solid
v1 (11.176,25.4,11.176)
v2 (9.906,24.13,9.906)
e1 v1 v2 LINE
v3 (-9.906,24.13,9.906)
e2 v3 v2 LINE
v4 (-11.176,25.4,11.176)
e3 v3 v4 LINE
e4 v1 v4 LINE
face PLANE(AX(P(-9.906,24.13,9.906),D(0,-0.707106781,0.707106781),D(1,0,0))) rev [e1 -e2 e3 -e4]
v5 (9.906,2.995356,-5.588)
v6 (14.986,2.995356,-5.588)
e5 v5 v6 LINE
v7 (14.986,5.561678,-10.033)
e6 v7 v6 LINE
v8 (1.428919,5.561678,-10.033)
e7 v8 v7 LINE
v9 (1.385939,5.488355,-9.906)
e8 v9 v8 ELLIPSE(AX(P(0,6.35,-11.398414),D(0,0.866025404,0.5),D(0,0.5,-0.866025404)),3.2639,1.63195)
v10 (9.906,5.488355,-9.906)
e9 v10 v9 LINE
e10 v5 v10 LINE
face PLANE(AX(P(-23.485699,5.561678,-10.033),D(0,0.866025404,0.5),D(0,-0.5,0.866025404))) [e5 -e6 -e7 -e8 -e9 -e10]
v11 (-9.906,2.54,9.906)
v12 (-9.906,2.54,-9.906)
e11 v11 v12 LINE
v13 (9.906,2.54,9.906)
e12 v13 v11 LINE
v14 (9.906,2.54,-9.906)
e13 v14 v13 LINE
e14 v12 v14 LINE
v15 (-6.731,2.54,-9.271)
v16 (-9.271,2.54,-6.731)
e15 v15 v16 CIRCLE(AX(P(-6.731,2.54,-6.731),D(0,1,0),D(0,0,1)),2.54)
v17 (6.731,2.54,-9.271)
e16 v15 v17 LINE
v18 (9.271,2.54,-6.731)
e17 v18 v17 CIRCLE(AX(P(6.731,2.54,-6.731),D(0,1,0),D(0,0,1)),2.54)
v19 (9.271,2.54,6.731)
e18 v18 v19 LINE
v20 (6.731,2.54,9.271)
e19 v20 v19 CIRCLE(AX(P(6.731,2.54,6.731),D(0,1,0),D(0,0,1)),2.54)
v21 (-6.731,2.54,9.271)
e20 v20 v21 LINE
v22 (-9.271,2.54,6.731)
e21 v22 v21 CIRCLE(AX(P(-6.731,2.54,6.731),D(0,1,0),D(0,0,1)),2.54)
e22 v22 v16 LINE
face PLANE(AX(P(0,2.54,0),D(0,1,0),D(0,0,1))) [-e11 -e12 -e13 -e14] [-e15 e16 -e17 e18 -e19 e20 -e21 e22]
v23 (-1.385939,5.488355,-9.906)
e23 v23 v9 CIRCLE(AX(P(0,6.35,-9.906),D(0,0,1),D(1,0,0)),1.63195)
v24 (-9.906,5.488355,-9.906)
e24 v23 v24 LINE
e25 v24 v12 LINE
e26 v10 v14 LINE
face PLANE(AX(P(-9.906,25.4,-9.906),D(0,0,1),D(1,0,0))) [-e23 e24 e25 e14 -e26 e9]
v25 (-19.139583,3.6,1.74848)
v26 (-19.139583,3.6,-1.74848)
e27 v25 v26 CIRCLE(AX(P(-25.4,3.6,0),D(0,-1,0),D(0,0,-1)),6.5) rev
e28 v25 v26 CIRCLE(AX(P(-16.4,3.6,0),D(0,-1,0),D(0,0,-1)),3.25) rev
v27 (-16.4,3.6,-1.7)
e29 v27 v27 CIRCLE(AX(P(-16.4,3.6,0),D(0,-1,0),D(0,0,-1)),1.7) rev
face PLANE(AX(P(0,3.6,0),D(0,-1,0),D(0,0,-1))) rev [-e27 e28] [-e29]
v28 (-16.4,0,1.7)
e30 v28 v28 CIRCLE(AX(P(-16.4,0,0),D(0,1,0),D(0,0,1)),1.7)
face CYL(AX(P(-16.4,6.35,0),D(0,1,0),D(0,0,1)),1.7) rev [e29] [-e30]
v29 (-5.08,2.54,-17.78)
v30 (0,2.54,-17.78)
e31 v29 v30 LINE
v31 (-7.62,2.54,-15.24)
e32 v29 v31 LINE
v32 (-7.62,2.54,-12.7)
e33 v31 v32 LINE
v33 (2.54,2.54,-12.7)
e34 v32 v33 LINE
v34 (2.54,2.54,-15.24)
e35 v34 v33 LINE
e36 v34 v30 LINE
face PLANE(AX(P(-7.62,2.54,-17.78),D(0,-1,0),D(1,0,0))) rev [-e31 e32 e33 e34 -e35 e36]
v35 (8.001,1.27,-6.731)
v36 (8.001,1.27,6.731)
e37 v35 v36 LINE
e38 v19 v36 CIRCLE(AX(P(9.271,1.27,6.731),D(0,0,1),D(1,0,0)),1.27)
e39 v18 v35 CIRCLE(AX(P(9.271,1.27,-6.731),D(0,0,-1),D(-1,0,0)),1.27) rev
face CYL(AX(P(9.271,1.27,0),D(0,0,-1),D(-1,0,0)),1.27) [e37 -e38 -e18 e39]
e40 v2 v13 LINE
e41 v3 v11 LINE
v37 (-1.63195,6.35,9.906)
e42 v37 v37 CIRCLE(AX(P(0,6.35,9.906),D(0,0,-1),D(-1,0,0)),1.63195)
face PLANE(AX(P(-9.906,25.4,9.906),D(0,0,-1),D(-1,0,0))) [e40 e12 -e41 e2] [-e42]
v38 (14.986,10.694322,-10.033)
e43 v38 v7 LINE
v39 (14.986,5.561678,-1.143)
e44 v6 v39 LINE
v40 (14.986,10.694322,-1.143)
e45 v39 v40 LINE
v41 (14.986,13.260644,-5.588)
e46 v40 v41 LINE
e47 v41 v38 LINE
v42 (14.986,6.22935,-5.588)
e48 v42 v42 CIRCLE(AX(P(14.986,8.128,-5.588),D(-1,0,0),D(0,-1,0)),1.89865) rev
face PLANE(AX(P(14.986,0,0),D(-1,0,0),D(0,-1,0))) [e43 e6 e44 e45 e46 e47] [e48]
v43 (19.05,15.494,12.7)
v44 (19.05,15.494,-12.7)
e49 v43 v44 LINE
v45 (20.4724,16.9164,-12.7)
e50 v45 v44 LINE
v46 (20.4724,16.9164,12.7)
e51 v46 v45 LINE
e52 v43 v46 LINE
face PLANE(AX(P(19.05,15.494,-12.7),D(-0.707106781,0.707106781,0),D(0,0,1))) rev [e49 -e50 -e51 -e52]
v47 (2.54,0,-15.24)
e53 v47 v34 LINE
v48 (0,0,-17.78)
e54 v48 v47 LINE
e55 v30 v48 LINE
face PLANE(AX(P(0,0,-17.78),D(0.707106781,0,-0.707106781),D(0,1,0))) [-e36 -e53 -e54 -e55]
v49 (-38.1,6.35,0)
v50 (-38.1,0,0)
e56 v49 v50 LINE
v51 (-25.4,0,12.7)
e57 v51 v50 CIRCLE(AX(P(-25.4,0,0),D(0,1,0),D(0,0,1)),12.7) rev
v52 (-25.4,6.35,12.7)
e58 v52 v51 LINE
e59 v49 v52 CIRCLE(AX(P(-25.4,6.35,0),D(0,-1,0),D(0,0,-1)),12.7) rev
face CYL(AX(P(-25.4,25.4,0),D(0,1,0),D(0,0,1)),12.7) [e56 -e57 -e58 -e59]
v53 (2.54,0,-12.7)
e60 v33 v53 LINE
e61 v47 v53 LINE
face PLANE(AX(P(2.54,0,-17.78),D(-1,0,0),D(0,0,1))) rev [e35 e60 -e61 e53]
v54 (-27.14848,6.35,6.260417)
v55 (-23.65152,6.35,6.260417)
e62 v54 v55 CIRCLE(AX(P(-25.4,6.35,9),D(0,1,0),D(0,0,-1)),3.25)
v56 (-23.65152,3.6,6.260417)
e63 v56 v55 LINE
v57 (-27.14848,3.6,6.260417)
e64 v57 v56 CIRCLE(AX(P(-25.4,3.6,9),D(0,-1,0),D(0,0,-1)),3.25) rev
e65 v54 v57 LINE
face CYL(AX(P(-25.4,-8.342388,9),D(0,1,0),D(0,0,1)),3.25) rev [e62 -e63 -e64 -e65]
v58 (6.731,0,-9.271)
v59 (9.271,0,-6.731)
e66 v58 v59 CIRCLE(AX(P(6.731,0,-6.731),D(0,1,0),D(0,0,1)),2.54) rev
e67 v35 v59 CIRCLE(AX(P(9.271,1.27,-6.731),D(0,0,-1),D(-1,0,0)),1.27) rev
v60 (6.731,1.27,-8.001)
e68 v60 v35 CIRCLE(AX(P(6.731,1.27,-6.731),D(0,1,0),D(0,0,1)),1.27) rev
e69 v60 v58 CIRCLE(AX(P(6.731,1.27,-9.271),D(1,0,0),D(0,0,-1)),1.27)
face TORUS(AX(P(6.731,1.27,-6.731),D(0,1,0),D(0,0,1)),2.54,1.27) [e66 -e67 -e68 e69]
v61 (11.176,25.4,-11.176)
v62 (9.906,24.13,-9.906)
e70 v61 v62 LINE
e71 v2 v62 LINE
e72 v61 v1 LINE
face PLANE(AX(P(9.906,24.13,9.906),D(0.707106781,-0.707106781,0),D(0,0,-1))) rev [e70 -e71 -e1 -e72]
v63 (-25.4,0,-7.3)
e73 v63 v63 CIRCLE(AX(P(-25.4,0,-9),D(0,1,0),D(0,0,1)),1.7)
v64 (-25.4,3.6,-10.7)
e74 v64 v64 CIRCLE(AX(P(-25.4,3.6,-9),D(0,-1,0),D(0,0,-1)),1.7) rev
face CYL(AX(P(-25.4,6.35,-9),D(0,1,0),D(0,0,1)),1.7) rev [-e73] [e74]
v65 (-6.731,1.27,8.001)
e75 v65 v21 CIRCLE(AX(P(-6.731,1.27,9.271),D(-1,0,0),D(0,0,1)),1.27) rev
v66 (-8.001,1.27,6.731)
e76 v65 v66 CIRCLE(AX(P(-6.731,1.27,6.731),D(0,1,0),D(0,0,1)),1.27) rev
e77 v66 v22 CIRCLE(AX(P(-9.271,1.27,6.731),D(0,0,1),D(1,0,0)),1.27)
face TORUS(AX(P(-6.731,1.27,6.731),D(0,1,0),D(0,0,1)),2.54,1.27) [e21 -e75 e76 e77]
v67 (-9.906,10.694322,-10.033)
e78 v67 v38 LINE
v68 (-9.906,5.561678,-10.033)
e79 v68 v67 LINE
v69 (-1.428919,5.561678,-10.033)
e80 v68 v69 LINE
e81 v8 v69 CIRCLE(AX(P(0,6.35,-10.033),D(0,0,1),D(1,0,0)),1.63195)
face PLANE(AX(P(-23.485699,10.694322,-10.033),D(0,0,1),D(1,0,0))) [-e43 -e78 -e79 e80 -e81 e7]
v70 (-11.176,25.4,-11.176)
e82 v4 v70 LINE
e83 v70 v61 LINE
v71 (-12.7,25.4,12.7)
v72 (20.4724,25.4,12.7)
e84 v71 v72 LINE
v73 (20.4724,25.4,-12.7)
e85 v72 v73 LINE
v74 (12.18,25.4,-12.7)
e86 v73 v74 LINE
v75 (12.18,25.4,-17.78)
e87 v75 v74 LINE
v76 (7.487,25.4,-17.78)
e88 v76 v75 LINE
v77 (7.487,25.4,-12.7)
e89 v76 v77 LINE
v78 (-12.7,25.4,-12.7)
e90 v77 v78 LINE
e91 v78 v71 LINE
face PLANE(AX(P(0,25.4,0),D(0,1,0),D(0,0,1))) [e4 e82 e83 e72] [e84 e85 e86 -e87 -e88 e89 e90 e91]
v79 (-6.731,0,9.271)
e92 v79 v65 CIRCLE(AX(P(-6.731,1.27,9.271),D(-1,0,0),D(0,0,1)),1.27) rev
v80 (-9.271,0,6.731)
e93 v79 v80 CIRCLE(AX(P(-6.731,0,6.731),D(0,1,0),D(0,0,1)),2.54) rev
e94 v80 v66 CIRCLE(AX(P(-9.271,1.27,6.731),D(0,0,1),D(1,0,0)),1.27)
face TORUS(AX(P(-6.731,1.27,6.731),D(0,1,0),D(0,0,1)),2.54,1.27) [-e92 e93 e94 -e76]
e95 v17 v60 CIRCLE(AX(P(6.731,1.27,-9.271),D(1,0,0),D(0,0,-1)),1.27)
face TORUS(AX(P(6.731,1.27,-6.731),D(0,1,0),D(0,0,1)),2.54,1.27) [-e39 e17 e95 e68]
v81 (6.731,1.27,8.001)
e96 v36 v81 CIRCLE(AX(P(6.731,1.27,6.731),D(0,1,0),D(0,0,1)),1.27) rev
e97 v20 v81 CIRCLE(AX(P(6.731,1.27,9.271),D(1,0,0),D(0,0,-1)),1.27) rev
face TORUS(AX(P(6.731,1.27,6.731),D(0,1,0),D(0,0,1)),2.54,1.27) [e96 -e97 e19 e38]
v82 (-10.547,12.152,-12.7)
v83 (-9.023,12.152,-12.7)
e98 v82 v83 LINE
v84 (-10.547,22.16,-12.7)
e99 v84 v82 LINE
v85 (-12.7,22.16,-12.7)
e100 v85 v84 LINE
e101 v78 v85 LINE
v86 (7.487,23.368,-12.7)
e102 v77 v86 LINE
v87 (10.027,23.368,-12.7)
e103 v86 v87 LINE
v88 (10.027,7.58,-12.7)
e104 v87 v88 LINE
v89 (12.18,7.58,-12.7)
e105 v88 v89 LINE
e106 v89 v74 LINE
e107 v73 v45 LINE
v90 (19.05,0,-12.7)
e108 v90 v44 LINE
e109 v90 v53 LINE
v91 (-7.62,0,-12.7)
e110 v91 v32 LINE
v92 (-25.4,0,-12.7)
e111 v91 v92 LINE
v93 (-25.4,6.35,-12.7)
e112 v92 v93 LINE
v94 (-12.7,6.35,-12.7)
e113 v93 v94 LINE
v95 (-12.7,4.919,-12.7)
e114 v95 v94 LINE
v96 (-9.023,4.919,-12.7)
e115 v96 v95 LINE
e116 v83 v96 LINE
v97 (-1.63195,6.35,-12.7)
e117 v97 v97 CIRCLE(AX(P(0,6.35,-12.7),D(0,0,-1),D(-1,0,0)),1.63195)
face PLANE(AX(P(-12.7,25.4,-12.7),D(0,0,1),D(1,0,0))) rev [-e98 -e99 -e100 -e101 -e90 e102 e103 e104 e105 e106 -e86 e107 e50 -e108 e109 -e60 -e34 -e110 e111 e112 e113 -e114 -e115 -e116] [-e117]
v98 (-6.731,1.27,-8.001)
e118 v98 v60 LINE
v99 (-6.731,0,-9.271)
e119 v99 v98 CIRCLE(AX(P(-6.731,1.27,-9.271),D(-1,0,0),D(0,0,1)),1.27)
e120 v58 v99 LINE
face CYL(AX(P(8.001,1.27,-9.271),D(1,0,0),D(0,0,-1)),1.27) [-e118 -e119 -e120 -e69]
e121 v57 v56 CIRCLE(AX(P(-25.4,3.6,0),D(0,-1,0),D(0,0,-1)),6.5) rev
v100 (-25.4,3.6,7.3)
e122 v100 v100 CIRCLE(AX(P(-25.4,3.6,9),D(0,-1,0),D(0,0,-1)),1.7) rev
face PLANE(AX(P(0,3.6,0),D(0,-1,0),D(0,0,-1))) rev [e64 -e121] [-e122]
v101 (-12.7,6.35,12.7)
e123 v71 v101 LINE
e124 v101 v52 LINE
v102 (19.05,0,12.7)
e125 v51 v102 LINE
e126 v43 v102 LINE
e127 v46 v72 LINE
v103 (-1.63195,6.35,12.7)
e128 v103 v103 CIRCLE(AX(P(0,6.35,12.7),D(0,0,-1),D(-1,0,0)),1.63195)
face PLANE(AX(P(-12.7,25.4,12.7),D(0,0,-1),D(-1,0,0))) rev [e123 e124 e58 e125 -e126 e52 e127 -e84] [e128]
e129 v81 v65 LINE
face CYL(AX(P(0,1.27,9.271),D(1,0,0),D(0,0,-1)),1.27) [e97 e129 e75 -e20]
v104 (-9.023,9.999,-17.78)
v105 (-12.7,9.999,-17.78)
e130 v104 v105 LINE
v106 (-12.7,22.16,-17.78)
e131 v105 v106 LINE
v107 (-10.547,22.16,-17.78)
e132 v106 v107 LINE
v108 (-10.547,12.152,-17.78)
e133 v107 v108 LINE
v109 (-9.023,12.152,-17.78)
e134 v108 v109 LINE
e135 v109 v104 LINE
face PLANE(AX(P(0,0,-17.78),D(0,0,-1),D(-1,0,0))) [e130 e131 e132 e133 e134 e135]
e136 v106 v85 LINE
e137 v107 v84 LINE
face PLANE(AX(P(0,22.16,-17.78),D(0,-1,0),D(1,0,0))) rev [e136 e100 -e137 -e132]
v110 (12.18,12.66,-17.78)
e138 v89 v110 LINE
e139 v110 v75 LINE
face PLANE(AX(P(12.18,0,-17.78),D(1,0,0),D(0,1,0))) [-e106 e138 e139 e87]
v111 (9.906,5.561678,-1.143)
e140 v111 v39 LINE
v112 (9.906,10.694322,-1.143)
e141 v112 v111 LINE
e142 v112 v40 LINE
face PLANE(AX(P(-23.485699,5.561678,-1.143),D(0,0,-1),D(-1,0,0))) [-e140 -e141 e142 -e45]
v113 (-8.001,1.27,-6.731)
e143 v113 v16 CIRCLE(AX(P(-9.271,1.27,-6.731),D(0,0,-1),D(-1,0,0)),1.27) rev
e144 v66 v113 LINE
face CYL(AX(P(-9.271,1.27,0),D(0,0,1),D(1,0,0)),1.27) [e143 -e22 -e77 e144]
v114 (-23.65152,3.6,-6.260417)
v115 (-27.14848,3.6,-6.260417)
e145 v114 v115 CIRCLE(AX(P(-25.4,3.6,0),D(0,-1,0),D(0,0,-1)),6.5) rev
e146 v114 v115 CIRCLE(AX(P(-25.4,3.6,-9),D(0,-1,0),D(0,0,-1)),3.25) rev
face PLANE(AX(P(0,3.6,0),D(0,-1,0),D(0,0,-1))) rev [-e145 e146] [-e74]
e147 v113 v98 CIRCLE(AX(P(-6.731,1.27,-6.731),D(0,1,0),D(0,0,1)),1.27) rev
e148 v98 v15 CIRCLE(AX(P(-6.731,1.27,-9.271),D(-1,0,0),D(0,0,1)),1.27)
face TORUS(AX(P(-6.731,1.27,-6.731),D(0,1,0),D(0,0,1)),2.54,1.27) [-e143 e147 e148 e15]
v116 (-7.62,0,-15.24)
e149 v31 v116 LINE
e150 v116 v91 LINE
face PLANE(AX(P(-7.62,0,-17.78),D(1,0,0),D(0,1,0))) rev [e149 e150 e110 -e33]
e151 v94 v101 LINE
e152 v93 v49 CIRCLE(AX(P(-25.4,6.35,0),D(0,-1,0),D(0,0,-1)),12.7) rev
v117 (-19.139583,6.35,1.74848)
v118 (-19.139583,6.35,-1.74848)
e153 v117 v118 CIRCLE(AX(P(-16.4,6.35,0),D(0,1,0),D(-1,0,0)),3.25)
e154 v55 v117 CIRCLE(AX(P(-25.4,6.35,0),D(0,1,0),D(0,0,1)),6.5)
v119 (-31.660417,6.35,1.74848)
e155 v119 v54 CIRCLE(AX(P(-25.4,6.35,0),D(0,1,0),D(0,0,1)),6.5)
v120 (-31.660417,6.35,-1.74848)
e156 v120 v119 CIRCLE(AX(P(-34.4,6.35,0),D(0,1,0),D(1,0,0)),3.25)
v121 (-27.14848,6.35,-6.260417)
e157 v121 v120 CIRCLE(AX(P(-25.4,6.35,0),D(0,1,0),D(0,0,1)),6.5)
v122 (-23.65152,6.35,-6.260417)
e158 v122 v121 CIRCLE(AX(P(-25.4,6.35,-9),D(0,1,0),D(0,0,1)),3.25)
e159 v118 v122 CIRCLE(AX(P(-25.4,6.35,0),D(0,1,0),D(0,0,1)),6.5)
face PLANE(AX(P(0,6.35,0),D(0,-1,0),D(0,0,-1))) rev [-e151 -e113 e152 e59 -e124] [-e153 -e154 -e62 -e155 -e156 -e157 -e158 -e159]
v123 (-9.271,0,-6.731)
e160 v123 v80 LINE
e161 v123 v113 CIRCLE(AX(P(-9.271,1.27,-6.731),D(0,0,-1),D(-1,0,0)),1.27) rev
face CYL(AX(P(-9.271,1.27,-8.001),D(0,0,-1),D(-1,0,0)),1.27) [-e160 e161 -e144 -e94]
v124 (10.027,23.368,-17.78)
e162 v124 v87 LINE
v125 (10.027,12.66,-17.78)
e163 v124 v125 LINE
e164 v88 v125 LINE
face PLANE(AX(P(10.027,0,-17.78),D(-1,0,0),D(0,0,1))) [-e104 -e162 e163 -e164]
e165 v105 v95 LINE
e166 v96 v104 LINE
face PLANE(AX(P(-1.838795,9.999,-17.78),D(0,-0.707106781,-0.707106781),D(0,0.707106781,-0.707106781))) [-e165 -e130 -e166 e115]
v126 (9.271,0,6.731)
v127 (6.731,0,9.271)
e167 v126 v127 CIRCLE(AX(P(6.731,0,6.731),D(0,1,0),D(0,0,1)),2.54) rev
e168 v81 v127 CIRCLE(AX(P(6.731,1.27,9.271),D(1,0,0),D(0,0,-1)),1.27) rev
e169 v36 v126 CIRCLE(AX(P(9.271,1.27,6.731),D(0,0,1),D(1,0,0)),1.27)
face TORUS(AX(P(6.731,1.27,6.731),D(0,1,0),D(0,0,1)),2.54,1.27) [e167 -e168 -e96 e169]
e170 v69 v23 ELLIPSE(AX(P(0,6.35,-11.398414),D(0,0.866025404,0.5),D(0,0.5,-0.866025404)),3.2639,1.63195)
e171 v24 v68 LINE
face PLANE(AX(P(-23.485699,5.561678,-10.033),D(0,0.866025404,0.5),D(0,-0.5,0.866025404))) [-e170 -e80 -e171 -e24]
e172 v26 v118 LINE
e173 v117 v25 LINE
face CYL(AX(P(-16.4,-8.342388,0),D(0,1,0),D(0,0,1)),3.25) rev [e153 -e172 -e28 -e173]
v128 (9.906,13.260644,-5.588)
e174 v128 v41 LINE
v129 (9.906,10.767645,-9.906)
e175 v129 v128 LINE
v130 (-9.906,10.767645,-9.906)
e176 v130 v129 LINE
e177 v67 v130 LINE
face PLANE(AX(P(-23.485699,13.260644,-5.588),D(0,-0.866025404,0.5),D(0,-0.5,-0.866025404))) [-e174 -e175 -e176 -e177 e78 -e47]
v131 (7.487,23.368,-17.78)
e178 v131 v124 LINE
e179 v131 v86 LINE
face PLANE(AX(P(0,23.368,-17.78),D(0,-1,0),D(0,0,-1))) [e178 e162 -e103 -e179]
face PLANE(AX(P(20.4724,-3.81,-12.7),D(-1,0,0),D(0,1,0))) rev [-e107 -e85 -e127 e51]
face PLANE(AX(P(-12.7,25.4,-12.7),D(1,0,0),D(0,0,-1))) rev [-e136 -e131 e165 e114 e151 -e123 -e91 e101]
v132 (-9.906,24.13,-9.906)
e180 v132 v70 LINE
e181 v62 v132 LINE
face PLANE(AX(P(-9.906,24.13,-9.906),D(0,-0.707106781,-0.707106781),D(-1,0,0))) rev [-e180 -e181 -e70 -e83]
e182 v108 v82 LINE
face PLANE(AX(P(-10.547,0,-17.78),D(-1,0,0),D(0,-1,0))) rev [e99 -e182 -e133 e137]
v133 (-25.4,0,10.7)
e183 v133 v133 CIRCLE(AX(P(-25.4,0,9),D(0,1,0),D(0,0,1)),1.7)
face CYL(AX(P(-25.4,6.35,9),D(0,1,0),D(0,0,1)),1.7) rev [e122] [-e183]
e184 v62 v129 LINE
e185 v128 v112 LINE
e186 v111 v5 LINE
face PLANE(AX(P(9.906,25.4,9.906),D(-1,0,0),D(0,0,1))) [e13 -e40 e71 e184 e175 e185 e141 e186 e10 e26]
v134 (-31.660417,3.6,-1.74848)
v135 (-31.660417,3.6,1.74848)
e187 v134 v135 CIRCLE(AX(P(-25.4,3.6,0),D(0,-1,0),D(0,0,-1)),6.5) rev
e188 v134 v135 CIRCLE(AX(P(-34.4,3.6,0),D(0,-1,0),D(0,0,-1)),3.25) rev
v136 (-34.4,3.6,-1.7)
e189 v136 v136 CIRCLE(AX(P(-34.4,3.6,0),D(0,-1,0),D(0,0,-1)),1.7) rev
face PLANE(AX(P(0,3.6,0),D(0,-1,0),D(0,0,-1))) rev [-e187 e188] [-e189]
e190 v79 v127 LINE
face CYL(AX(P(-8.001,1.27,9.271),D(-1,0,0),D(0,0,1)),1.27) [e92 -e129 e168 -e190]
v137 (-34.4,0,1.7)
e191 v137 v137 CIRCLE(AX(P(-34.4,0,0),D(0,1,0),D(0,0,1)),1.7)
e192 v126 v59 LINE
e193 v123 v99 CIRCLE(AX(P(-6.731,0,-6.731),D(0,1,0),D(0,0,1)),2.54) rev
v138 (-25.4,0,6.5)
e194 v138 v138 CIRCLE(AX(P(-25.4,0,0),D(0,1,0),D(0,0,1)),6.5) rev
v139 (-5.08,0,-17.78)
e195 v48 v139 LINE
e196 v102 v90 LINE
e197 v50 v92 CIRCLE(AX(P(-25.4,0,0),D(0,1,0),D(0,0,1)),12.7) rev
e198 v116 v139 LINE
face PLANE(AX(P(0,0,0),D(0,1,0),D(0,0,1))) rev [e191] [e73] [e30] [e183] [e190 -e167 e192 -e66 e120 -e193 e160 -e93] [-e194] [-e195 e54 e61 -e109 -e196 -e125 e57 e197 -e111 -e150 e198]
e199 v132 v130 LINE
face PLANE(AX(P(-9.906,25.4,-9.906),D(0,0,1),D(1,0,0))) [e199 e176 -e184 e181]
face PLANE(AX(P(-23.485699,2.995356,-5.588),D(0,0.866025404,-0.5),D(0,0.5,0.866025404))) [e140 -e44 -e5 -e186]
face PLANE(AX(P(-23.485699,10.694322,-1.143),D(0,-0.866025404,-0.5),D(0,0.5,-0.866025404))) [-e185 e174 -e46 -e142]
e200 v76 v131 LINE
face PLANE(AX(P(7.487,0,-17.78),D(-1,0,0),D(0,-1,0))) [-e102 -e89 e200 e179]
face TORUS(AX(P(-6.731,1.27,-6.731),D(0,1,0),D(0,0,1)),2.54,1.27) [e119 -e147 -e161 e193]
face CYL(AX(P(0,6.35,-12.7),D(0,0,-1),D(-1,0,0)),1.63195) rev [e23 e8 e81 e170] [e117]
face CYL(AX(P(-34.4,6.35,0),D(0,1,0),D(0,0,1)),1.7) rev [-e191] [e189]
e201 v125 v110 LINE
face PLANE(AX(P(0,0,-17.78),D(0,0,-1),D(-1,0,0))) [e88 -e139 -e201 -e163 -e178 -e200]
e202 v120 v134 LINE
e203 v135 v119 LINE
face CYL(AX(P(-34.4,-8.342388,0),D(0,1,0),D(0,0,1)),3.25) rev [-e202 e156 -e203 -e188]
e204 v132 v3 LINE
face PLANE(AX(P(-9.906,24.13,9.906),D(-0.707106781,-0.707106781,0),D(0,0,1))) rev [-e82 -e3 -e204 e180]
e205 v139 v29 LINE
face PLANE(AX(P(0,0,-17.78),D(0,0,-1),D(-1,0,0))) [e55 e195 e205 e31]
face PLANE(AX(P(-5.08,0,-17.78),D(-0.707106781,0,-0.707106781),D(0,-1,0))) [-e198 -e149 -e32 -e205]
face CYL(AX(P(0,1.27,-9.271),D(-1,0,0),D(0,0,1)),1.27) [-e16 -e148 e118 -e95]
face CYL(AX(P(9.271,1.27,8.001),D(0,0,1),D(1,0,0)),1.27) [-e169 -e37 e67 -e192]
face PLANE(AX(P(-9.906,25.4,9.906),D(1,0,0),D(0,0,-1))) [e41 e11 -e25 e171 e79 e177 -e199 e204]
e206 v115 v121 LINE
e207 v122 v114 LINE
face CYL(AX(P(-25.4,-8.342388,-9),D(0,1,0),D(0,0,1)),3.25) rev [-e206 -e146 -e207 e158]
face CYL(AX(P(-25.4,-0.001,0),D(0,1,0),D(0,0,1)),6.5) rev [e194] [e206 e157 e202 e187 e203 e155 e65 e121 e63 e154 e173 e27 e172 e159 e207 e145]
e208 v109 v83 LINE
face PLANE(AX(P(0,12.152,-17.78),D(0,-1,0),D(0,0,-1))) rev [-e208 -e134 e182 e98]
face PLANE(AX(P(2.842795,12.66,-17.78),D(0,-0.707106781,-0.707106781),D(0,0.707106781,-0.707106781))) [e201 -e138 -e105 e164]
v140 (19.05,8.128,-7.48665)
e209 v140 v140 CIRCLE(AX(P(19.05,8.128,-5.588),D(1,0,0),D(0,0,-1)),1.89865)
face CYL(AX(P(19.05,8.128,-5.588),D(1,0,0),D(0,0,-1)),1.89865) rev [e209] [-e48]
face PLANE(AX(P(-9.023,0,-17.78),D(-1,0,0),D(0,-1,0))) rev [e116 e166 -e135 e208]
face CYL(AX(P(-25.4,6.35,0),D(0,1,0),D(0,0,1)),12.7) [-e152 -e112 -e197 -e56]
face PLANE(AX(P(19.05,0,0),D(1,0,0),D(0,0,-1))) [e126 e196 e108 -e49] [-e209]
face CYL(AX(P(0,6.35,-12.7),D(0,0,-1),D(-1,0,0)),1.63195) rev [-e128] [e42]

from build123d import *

# Parameters (mm, degrees)
SKETCH1_W                      = 25.4
SKETCH1_H                      = 25.4
SKETCH1_W_2                    = 19.812
SKETCH1_H_2                    = 19.812
BOSS_EXTRUDE1_DEPTH            = 25.4
SKETCH4_W                      = 25.4
SKETCH4_H                      = 25.4
BOSS_EXTRUDE2_DEPTH            = 6.35
F_6_CLEARANCE_HOLE2_D          = 3.7973
F_6_CLEARANCE_HOLE2_DEPTH      = 9.144
CUT_EXTRUDE1_DEPTH             = 5.08
CUT_EXTRUDE1_DIRECTION_2_REACH = 38.297
SKETCH8_W                      = 25.4
SKETCH8_H                      = 9.905999957
BOSS_EXTRUDE4_DEPTH            = 1.4224
SKETCH9_W                      = 25.4
SKETCH9_H                      = 25.4
BOSS_EXTRUDE5_DEPTH            = 6.35
CUT_EXTRUDE2_REACH             = 46.45
SKETCH10_R                     = 6.5
M3_CLEARANCE_HOLE1_D           = 3.4
CIRPATTERN1_COUNT              = 4
FILLET1_R                      = 12.7
SKETCH15_W                     = 19.812
SKETCH15_H                     = 19.812
SKETCH15_W_2                   = 16.002
SKETCH15_H_2                   = 16.002
BOSS_EXTRUDE6_DEPTH            = 2.54
SKETCH17_R                     = 3.25
CUT_EXTRUDE4_DEPTH             = 2.75
CIRPATTERN2_COUNT              = 4
FILLET4_R                      = 1.27
F_4_CLEARANCE_HOLE1_D          = 3.2639
CHAMFER1_SIZE                  = 1.4224
CHAMFER2_SIZE                  = 1.27
SKETCH22_W                     = 10.16
SKETCH22_H                     = 2.54
BOSS_EXTRUDE7_DEPTH            = 5.08
CHAMFER3_SIZE                  = 2.54
BOSS_EXTRUDE8_DEPTH            = 5.08
BOSS_EXTRUDE9_DEPTH            = 2.153
BOSS_EXTRUDE10_DEPTH           = 3.677


with BuildPart() as part:
    # Sketch1 → Boss-Extrude1 (new body)
    with BuildSketch(Plane(origin=(0, 0, 0), x_dir=(1, 0, 0), z_dir=(0, 1, 0))):
        Rectangle(SKETCH1_W, SKETCH1_H)
        Rectangle(SKETCH1_W_2, SKETCH1_H_2, mode=Mode.SUBTRACT)
    extrude(amount=BOSS_EXTRUDE1_DEPTH)

    # Sketch4 → Boss-Extrude2 (add)
    with BuildSketch(Plane(origin=(12.7, 0, 0), x_dir=(0, 0, -1), z_dir=(1, 0, 0))):
        with Locations((0, 12.7)):
            Rectangle(SKETCH4_W, SKETCH4_H)
    extrude(amount=BOSS_EXTRUDE2_DEPTH)

    # #6 Clearance Hole2
    with Locations(Plane(origin=(19.05, 0, 0), x_dir=(0, 0, -1), z_dir=(1, 0, 0))):
        with Locations((5.588, 8.128000043)):
            Hole(F_6_CLEARANCE_HOLE2_D / 2, depth=F_6_CLEARANCE_HOLE2_DEPTH)

    # Sketch7 → Cut-Extrude1 (cut)
    with BuildSketch(Plane.ZY.offset(-9.906)):
        Polygon((-5.588, 13.260643936), (-10.033, 10.69432199), (-10.033, 5.561678096), (-5.588, 2.99535615), (-1.143, 5.561678096), (-1.143, 10.69432199), align=None)
    extrude(amount=-CUT_EXTRUDE1_DEPTH, mode=Mode.SUBTRACT)

    # Cut-Extrude1 direction 2: up to this face of the body (flat: up to its plane)
    cut_extrude1_direction_2_end = Plane(part.part.faces().sort_by_distance((-9.906, 12.7, 0))[0])
    # Sketch7 → Cut-Extrude1 direction 2 (cut, up to the picked face)
    with BuildSketch(Plane.ZY.offset(-9.906), mode=Mode.PRIVATE) as cut_extrude1_direction_2_sk1:
        Polygon((-5.588, 13.260643936), (-10.033, 10.69432199), (-10.033, 5.561678096), (-5.588, 2.99535615), (-1.143, 5.561678096), (-1.143, 10.69432199), align=None)
    cut_extrude1_direction_2_tool1 = split(extrude(cut_extrude1_direction_2_sk1.sketch, amount=CUT_EXTRUDE1_DIRECTION_2_REACH, mode=Mode.PRIVATE), bisect_by=cut_extrude1_direction_2_end, keep=Keep.BOTH, mode=Mode.PRIVATE)
    add(cut_extrude1_direction_2_tool1.solids().sort_by(Axis((9.906, 8.128, -5.588), (-1, 0, 0)))[0], mode=Mode.SUBTRACT)

    # Sketch8 → Boss-Extrude4 (add)
    with BuildSketch(Plane(origin=(19.05, 0, 0), x_dir=(0, 0, -1), z_dir=(1, 0, 0))):
        with Locations((0, 20.447000022)):
            Rectangle(SKETCH8_W, SKETCH8_H)
    extrude(amount=BOSS_EXTRUDE4_DEPTH)

    # Sketch9 → Boss-Extrude5 (add)
    with BuildSketch(Plane.XZ):
        with Locations((-25.4, 0)):
            Rectangle(SKETCH9_W, SKETCH9_H)
    extrude(amount=-BOSS_EXTRUDE5_DEPTH)

    # Sketch10 → Cut-Extrude2 (cut, up to next)
    with BuildSketch(Plane(origin=(0, 6.35, 0), x_dir=(1, 0, 0), z_dir=(0, 1, 0)), mode=Mode.PRIVATE) as cut_extrude2_sk1:
        with Locations(Location((-25.4, 0, 0), (0, 0, 270))):
            Circle(SKETCH10_R)
    cut_extrude2_tool1 = extrude(cut_extrude2_sk1.sketch, amount=-CUT_EXTRUDE2_REACH, mode=Mode.PRIVATE) & part.part
    add(cut_extrude2_tool1.solids().sort_by_distance((-25.4, 6.35, 0))[0], mode=Mode.SUBTRACT)

    # M3 Clearance Hole1 (through all)
    with Locations(Plane(origin=(0, 6.35, 0), x_dir=(1, 0, 0), z_dir=(0, 1, 0))):
        with Locations((-25.4, 9)):
            m3_clearance_hole1 = Hole(M3_CLEARANCE_HOLE1_D / 2)

    # CirPattern1: M3 Clearance Hole1 ×4 about axis
    cirpattern1_axis = Axis((-25.4, 0, 0), (0, 1, 0))
    for i in range(1, CIRPATTERN1_COUNT):
        add(m3_clearance_hole1.rotate(cirpattern1_axis, i * 360 / CIRPATTERN1_COUNT), mode=Mode.SUBTRACT)

    # Fillet1
    fillet1_edges = [part.edges().sort_by_distance(p)[0] for p in [
        (-38.1, 3.175, 12.7),
        (-38.1, 3.175, -12.7),
    ]]
    fillet(fillet1_edges, radius=FILLET1_R - 0.0001)  # a hair under: the kernel refuses the full size

    # Sketch15 → Boss-Extrude6 (add)
    with BuildSketch(Plane.XZ):
        Rectangle(SKETCH15_W, SKETCH15_H)
        Rectangle(SKETCH15_W_2, SKETCH15_H_2, mode=Mode.SUBTRACT)
    extrude(amount=-BOSS_EXTRUDE6_DEPTH)

    # Sketch17 → Cut-Extrude4 (cut)
    with BuildSketch(Plane(origin=(0, 6.35, 0), x_dir=(1, 0, 0), z_dir=(0, 1, 0))):
        with Locations((-25.4, 9)):
            Circle(SKETCH17_R)
    cut_extrude4 = extrude(amount=-CUT_EXTRUDE4_DEPTH, mode=Mode.SUBTRACT)

    # CirPattern2: Cut-Extrude4 ×4 about axis
    cirpattern2_axis = Axis((-25.4, 0, 0), (0, 1, 0))
    for i in range(1, CIRPATTERN2_COUNT):
        add(cut_extrude4.rotate(cirpattern2_axis, i * 360 / CIRPATTERN2_COUNT), mode=Mode.SUBTRACT)

    # Fillet4
    fillet4_edges = [part.edges().sort_by_distance(p)[0] for p in [
        (-8.001, 2.54, 0),
        (0, 2.54, -8.001),
        (8.001, 2.54, 0),
        (0, 2.54, 8.001),
        (-8.001, 0, 0),
        (-8.001, 1.27, 8.001),
        (0, 0, 8.001),
        (8.001, 1.27, 8.001),
        (8.001, 0, 0),
        (8.001, 1.27, -8.001),
        (0, 0, -8.001),
        (-8.001, 1.27, -8.001),
    ]]
    fillet(fillet4_edges, radius=FILLET4_R - 0.0001)  # a hair under: the kernel refuses the full size

    # #4 Clearance Hole1 (through all)
    with Locations(Plane(origin=(0, 0, -12.7), x_dir=(-1, 0, 0), z_dir=(0, 0, -1))):
        with Locations((0, 6.35)):
            Hole(F_4_CLEARANCE_HOLE1_D / 2)

    # Chamfer1
    chamfer1_edges = [part.edges().sort_by_distance(p)[0] for p in [
        (20.4724, 15.494000043, 0),
    ]]
    chamfer(chamfer1_edges, length=CHAMFER1_SIZE - 0.0001)  # a hair under: the kernel refuses the full size

    # Chamfer2
    chamfer2_edges = [part.edges().sort_by_distance(p)[0] for p in [
        (9.906, 25.4, 0),
        (0, 25.4, -9.906),
        (-9.906, 25.4, 0),
        (0, 25.4, 9.906),
    ]]
    chamfer(chamfer2_edges, length=CHAMFER2_SIZE)

    # Sketch22 → Boss-Extrude7 (add)
    with BuildSketch(Plane(origin=(0, 0, -12.7), x_dir=(-1, 0, 0), z_dir=(0, 0, -1))):
        with Locations((2.54, 1.27)):
            Rectangle(SKETCH22_W, SKETCH22_H)
    extrude(amount=BOSS_EXTRUDE7_DEPTH)

    # Chamfer3
    chamfer3_edges = [part.edges().sort_by_distance(p)[0] for p in [
        (-7.62, 1.27, -17.78),
        (2.54, 1.27, -17.78),
    ]]
    chamfer(chamfer3_edges, length=CHAMFER3_SIZE)

    # Sketch23 → Boss-Extrude8 (add)
    with BuildSketch(Plane(origin=(0, 0, -12.7), x_dir=(-1, 0, 0), z_dir=(0, 0, -1))):
        Polygon((12.7, 9.999), (12.7, 22.16), (10.547, 22.16), (10.547, 12.152), (9.023, 12.152), (9.023, 9.999), align=None)
        Polygon((-7.487, 25.4), (-12.18, 25.4), (-12.18, 12.66), (-10.027, 12.66), (-10.027, 23.368), (-7.487, 23.368), align=None)
    extrude(amount=BOSS_EXTRUDE8_DEPTH)

    # Sketch24 → Boss-Extrude9 (add)
    with BuildSketch(Plane(origin=(12.18, 0, 0), x_dir=(0, 0, -1), z_dir=(1, 0, 0))):
        Polygon((17.78, 12.66), (12.7, 12.66), (12.7, 7.58), align=None)
    extrude(amount=-BOSS_EXTRUDE9_DEPTH)

    # Sketch25 → Boss-Extrude10 (add)
    with BuildSketch(Plane.ZY.offset(12.7)):
        Polygon((-17.78, 9.999), (-12.7, 9.999), (-12.7, 4.919), align=None)
    extrude(amount=-BOSS_EXTRUDE10_DEPTH)


solid = part.part
